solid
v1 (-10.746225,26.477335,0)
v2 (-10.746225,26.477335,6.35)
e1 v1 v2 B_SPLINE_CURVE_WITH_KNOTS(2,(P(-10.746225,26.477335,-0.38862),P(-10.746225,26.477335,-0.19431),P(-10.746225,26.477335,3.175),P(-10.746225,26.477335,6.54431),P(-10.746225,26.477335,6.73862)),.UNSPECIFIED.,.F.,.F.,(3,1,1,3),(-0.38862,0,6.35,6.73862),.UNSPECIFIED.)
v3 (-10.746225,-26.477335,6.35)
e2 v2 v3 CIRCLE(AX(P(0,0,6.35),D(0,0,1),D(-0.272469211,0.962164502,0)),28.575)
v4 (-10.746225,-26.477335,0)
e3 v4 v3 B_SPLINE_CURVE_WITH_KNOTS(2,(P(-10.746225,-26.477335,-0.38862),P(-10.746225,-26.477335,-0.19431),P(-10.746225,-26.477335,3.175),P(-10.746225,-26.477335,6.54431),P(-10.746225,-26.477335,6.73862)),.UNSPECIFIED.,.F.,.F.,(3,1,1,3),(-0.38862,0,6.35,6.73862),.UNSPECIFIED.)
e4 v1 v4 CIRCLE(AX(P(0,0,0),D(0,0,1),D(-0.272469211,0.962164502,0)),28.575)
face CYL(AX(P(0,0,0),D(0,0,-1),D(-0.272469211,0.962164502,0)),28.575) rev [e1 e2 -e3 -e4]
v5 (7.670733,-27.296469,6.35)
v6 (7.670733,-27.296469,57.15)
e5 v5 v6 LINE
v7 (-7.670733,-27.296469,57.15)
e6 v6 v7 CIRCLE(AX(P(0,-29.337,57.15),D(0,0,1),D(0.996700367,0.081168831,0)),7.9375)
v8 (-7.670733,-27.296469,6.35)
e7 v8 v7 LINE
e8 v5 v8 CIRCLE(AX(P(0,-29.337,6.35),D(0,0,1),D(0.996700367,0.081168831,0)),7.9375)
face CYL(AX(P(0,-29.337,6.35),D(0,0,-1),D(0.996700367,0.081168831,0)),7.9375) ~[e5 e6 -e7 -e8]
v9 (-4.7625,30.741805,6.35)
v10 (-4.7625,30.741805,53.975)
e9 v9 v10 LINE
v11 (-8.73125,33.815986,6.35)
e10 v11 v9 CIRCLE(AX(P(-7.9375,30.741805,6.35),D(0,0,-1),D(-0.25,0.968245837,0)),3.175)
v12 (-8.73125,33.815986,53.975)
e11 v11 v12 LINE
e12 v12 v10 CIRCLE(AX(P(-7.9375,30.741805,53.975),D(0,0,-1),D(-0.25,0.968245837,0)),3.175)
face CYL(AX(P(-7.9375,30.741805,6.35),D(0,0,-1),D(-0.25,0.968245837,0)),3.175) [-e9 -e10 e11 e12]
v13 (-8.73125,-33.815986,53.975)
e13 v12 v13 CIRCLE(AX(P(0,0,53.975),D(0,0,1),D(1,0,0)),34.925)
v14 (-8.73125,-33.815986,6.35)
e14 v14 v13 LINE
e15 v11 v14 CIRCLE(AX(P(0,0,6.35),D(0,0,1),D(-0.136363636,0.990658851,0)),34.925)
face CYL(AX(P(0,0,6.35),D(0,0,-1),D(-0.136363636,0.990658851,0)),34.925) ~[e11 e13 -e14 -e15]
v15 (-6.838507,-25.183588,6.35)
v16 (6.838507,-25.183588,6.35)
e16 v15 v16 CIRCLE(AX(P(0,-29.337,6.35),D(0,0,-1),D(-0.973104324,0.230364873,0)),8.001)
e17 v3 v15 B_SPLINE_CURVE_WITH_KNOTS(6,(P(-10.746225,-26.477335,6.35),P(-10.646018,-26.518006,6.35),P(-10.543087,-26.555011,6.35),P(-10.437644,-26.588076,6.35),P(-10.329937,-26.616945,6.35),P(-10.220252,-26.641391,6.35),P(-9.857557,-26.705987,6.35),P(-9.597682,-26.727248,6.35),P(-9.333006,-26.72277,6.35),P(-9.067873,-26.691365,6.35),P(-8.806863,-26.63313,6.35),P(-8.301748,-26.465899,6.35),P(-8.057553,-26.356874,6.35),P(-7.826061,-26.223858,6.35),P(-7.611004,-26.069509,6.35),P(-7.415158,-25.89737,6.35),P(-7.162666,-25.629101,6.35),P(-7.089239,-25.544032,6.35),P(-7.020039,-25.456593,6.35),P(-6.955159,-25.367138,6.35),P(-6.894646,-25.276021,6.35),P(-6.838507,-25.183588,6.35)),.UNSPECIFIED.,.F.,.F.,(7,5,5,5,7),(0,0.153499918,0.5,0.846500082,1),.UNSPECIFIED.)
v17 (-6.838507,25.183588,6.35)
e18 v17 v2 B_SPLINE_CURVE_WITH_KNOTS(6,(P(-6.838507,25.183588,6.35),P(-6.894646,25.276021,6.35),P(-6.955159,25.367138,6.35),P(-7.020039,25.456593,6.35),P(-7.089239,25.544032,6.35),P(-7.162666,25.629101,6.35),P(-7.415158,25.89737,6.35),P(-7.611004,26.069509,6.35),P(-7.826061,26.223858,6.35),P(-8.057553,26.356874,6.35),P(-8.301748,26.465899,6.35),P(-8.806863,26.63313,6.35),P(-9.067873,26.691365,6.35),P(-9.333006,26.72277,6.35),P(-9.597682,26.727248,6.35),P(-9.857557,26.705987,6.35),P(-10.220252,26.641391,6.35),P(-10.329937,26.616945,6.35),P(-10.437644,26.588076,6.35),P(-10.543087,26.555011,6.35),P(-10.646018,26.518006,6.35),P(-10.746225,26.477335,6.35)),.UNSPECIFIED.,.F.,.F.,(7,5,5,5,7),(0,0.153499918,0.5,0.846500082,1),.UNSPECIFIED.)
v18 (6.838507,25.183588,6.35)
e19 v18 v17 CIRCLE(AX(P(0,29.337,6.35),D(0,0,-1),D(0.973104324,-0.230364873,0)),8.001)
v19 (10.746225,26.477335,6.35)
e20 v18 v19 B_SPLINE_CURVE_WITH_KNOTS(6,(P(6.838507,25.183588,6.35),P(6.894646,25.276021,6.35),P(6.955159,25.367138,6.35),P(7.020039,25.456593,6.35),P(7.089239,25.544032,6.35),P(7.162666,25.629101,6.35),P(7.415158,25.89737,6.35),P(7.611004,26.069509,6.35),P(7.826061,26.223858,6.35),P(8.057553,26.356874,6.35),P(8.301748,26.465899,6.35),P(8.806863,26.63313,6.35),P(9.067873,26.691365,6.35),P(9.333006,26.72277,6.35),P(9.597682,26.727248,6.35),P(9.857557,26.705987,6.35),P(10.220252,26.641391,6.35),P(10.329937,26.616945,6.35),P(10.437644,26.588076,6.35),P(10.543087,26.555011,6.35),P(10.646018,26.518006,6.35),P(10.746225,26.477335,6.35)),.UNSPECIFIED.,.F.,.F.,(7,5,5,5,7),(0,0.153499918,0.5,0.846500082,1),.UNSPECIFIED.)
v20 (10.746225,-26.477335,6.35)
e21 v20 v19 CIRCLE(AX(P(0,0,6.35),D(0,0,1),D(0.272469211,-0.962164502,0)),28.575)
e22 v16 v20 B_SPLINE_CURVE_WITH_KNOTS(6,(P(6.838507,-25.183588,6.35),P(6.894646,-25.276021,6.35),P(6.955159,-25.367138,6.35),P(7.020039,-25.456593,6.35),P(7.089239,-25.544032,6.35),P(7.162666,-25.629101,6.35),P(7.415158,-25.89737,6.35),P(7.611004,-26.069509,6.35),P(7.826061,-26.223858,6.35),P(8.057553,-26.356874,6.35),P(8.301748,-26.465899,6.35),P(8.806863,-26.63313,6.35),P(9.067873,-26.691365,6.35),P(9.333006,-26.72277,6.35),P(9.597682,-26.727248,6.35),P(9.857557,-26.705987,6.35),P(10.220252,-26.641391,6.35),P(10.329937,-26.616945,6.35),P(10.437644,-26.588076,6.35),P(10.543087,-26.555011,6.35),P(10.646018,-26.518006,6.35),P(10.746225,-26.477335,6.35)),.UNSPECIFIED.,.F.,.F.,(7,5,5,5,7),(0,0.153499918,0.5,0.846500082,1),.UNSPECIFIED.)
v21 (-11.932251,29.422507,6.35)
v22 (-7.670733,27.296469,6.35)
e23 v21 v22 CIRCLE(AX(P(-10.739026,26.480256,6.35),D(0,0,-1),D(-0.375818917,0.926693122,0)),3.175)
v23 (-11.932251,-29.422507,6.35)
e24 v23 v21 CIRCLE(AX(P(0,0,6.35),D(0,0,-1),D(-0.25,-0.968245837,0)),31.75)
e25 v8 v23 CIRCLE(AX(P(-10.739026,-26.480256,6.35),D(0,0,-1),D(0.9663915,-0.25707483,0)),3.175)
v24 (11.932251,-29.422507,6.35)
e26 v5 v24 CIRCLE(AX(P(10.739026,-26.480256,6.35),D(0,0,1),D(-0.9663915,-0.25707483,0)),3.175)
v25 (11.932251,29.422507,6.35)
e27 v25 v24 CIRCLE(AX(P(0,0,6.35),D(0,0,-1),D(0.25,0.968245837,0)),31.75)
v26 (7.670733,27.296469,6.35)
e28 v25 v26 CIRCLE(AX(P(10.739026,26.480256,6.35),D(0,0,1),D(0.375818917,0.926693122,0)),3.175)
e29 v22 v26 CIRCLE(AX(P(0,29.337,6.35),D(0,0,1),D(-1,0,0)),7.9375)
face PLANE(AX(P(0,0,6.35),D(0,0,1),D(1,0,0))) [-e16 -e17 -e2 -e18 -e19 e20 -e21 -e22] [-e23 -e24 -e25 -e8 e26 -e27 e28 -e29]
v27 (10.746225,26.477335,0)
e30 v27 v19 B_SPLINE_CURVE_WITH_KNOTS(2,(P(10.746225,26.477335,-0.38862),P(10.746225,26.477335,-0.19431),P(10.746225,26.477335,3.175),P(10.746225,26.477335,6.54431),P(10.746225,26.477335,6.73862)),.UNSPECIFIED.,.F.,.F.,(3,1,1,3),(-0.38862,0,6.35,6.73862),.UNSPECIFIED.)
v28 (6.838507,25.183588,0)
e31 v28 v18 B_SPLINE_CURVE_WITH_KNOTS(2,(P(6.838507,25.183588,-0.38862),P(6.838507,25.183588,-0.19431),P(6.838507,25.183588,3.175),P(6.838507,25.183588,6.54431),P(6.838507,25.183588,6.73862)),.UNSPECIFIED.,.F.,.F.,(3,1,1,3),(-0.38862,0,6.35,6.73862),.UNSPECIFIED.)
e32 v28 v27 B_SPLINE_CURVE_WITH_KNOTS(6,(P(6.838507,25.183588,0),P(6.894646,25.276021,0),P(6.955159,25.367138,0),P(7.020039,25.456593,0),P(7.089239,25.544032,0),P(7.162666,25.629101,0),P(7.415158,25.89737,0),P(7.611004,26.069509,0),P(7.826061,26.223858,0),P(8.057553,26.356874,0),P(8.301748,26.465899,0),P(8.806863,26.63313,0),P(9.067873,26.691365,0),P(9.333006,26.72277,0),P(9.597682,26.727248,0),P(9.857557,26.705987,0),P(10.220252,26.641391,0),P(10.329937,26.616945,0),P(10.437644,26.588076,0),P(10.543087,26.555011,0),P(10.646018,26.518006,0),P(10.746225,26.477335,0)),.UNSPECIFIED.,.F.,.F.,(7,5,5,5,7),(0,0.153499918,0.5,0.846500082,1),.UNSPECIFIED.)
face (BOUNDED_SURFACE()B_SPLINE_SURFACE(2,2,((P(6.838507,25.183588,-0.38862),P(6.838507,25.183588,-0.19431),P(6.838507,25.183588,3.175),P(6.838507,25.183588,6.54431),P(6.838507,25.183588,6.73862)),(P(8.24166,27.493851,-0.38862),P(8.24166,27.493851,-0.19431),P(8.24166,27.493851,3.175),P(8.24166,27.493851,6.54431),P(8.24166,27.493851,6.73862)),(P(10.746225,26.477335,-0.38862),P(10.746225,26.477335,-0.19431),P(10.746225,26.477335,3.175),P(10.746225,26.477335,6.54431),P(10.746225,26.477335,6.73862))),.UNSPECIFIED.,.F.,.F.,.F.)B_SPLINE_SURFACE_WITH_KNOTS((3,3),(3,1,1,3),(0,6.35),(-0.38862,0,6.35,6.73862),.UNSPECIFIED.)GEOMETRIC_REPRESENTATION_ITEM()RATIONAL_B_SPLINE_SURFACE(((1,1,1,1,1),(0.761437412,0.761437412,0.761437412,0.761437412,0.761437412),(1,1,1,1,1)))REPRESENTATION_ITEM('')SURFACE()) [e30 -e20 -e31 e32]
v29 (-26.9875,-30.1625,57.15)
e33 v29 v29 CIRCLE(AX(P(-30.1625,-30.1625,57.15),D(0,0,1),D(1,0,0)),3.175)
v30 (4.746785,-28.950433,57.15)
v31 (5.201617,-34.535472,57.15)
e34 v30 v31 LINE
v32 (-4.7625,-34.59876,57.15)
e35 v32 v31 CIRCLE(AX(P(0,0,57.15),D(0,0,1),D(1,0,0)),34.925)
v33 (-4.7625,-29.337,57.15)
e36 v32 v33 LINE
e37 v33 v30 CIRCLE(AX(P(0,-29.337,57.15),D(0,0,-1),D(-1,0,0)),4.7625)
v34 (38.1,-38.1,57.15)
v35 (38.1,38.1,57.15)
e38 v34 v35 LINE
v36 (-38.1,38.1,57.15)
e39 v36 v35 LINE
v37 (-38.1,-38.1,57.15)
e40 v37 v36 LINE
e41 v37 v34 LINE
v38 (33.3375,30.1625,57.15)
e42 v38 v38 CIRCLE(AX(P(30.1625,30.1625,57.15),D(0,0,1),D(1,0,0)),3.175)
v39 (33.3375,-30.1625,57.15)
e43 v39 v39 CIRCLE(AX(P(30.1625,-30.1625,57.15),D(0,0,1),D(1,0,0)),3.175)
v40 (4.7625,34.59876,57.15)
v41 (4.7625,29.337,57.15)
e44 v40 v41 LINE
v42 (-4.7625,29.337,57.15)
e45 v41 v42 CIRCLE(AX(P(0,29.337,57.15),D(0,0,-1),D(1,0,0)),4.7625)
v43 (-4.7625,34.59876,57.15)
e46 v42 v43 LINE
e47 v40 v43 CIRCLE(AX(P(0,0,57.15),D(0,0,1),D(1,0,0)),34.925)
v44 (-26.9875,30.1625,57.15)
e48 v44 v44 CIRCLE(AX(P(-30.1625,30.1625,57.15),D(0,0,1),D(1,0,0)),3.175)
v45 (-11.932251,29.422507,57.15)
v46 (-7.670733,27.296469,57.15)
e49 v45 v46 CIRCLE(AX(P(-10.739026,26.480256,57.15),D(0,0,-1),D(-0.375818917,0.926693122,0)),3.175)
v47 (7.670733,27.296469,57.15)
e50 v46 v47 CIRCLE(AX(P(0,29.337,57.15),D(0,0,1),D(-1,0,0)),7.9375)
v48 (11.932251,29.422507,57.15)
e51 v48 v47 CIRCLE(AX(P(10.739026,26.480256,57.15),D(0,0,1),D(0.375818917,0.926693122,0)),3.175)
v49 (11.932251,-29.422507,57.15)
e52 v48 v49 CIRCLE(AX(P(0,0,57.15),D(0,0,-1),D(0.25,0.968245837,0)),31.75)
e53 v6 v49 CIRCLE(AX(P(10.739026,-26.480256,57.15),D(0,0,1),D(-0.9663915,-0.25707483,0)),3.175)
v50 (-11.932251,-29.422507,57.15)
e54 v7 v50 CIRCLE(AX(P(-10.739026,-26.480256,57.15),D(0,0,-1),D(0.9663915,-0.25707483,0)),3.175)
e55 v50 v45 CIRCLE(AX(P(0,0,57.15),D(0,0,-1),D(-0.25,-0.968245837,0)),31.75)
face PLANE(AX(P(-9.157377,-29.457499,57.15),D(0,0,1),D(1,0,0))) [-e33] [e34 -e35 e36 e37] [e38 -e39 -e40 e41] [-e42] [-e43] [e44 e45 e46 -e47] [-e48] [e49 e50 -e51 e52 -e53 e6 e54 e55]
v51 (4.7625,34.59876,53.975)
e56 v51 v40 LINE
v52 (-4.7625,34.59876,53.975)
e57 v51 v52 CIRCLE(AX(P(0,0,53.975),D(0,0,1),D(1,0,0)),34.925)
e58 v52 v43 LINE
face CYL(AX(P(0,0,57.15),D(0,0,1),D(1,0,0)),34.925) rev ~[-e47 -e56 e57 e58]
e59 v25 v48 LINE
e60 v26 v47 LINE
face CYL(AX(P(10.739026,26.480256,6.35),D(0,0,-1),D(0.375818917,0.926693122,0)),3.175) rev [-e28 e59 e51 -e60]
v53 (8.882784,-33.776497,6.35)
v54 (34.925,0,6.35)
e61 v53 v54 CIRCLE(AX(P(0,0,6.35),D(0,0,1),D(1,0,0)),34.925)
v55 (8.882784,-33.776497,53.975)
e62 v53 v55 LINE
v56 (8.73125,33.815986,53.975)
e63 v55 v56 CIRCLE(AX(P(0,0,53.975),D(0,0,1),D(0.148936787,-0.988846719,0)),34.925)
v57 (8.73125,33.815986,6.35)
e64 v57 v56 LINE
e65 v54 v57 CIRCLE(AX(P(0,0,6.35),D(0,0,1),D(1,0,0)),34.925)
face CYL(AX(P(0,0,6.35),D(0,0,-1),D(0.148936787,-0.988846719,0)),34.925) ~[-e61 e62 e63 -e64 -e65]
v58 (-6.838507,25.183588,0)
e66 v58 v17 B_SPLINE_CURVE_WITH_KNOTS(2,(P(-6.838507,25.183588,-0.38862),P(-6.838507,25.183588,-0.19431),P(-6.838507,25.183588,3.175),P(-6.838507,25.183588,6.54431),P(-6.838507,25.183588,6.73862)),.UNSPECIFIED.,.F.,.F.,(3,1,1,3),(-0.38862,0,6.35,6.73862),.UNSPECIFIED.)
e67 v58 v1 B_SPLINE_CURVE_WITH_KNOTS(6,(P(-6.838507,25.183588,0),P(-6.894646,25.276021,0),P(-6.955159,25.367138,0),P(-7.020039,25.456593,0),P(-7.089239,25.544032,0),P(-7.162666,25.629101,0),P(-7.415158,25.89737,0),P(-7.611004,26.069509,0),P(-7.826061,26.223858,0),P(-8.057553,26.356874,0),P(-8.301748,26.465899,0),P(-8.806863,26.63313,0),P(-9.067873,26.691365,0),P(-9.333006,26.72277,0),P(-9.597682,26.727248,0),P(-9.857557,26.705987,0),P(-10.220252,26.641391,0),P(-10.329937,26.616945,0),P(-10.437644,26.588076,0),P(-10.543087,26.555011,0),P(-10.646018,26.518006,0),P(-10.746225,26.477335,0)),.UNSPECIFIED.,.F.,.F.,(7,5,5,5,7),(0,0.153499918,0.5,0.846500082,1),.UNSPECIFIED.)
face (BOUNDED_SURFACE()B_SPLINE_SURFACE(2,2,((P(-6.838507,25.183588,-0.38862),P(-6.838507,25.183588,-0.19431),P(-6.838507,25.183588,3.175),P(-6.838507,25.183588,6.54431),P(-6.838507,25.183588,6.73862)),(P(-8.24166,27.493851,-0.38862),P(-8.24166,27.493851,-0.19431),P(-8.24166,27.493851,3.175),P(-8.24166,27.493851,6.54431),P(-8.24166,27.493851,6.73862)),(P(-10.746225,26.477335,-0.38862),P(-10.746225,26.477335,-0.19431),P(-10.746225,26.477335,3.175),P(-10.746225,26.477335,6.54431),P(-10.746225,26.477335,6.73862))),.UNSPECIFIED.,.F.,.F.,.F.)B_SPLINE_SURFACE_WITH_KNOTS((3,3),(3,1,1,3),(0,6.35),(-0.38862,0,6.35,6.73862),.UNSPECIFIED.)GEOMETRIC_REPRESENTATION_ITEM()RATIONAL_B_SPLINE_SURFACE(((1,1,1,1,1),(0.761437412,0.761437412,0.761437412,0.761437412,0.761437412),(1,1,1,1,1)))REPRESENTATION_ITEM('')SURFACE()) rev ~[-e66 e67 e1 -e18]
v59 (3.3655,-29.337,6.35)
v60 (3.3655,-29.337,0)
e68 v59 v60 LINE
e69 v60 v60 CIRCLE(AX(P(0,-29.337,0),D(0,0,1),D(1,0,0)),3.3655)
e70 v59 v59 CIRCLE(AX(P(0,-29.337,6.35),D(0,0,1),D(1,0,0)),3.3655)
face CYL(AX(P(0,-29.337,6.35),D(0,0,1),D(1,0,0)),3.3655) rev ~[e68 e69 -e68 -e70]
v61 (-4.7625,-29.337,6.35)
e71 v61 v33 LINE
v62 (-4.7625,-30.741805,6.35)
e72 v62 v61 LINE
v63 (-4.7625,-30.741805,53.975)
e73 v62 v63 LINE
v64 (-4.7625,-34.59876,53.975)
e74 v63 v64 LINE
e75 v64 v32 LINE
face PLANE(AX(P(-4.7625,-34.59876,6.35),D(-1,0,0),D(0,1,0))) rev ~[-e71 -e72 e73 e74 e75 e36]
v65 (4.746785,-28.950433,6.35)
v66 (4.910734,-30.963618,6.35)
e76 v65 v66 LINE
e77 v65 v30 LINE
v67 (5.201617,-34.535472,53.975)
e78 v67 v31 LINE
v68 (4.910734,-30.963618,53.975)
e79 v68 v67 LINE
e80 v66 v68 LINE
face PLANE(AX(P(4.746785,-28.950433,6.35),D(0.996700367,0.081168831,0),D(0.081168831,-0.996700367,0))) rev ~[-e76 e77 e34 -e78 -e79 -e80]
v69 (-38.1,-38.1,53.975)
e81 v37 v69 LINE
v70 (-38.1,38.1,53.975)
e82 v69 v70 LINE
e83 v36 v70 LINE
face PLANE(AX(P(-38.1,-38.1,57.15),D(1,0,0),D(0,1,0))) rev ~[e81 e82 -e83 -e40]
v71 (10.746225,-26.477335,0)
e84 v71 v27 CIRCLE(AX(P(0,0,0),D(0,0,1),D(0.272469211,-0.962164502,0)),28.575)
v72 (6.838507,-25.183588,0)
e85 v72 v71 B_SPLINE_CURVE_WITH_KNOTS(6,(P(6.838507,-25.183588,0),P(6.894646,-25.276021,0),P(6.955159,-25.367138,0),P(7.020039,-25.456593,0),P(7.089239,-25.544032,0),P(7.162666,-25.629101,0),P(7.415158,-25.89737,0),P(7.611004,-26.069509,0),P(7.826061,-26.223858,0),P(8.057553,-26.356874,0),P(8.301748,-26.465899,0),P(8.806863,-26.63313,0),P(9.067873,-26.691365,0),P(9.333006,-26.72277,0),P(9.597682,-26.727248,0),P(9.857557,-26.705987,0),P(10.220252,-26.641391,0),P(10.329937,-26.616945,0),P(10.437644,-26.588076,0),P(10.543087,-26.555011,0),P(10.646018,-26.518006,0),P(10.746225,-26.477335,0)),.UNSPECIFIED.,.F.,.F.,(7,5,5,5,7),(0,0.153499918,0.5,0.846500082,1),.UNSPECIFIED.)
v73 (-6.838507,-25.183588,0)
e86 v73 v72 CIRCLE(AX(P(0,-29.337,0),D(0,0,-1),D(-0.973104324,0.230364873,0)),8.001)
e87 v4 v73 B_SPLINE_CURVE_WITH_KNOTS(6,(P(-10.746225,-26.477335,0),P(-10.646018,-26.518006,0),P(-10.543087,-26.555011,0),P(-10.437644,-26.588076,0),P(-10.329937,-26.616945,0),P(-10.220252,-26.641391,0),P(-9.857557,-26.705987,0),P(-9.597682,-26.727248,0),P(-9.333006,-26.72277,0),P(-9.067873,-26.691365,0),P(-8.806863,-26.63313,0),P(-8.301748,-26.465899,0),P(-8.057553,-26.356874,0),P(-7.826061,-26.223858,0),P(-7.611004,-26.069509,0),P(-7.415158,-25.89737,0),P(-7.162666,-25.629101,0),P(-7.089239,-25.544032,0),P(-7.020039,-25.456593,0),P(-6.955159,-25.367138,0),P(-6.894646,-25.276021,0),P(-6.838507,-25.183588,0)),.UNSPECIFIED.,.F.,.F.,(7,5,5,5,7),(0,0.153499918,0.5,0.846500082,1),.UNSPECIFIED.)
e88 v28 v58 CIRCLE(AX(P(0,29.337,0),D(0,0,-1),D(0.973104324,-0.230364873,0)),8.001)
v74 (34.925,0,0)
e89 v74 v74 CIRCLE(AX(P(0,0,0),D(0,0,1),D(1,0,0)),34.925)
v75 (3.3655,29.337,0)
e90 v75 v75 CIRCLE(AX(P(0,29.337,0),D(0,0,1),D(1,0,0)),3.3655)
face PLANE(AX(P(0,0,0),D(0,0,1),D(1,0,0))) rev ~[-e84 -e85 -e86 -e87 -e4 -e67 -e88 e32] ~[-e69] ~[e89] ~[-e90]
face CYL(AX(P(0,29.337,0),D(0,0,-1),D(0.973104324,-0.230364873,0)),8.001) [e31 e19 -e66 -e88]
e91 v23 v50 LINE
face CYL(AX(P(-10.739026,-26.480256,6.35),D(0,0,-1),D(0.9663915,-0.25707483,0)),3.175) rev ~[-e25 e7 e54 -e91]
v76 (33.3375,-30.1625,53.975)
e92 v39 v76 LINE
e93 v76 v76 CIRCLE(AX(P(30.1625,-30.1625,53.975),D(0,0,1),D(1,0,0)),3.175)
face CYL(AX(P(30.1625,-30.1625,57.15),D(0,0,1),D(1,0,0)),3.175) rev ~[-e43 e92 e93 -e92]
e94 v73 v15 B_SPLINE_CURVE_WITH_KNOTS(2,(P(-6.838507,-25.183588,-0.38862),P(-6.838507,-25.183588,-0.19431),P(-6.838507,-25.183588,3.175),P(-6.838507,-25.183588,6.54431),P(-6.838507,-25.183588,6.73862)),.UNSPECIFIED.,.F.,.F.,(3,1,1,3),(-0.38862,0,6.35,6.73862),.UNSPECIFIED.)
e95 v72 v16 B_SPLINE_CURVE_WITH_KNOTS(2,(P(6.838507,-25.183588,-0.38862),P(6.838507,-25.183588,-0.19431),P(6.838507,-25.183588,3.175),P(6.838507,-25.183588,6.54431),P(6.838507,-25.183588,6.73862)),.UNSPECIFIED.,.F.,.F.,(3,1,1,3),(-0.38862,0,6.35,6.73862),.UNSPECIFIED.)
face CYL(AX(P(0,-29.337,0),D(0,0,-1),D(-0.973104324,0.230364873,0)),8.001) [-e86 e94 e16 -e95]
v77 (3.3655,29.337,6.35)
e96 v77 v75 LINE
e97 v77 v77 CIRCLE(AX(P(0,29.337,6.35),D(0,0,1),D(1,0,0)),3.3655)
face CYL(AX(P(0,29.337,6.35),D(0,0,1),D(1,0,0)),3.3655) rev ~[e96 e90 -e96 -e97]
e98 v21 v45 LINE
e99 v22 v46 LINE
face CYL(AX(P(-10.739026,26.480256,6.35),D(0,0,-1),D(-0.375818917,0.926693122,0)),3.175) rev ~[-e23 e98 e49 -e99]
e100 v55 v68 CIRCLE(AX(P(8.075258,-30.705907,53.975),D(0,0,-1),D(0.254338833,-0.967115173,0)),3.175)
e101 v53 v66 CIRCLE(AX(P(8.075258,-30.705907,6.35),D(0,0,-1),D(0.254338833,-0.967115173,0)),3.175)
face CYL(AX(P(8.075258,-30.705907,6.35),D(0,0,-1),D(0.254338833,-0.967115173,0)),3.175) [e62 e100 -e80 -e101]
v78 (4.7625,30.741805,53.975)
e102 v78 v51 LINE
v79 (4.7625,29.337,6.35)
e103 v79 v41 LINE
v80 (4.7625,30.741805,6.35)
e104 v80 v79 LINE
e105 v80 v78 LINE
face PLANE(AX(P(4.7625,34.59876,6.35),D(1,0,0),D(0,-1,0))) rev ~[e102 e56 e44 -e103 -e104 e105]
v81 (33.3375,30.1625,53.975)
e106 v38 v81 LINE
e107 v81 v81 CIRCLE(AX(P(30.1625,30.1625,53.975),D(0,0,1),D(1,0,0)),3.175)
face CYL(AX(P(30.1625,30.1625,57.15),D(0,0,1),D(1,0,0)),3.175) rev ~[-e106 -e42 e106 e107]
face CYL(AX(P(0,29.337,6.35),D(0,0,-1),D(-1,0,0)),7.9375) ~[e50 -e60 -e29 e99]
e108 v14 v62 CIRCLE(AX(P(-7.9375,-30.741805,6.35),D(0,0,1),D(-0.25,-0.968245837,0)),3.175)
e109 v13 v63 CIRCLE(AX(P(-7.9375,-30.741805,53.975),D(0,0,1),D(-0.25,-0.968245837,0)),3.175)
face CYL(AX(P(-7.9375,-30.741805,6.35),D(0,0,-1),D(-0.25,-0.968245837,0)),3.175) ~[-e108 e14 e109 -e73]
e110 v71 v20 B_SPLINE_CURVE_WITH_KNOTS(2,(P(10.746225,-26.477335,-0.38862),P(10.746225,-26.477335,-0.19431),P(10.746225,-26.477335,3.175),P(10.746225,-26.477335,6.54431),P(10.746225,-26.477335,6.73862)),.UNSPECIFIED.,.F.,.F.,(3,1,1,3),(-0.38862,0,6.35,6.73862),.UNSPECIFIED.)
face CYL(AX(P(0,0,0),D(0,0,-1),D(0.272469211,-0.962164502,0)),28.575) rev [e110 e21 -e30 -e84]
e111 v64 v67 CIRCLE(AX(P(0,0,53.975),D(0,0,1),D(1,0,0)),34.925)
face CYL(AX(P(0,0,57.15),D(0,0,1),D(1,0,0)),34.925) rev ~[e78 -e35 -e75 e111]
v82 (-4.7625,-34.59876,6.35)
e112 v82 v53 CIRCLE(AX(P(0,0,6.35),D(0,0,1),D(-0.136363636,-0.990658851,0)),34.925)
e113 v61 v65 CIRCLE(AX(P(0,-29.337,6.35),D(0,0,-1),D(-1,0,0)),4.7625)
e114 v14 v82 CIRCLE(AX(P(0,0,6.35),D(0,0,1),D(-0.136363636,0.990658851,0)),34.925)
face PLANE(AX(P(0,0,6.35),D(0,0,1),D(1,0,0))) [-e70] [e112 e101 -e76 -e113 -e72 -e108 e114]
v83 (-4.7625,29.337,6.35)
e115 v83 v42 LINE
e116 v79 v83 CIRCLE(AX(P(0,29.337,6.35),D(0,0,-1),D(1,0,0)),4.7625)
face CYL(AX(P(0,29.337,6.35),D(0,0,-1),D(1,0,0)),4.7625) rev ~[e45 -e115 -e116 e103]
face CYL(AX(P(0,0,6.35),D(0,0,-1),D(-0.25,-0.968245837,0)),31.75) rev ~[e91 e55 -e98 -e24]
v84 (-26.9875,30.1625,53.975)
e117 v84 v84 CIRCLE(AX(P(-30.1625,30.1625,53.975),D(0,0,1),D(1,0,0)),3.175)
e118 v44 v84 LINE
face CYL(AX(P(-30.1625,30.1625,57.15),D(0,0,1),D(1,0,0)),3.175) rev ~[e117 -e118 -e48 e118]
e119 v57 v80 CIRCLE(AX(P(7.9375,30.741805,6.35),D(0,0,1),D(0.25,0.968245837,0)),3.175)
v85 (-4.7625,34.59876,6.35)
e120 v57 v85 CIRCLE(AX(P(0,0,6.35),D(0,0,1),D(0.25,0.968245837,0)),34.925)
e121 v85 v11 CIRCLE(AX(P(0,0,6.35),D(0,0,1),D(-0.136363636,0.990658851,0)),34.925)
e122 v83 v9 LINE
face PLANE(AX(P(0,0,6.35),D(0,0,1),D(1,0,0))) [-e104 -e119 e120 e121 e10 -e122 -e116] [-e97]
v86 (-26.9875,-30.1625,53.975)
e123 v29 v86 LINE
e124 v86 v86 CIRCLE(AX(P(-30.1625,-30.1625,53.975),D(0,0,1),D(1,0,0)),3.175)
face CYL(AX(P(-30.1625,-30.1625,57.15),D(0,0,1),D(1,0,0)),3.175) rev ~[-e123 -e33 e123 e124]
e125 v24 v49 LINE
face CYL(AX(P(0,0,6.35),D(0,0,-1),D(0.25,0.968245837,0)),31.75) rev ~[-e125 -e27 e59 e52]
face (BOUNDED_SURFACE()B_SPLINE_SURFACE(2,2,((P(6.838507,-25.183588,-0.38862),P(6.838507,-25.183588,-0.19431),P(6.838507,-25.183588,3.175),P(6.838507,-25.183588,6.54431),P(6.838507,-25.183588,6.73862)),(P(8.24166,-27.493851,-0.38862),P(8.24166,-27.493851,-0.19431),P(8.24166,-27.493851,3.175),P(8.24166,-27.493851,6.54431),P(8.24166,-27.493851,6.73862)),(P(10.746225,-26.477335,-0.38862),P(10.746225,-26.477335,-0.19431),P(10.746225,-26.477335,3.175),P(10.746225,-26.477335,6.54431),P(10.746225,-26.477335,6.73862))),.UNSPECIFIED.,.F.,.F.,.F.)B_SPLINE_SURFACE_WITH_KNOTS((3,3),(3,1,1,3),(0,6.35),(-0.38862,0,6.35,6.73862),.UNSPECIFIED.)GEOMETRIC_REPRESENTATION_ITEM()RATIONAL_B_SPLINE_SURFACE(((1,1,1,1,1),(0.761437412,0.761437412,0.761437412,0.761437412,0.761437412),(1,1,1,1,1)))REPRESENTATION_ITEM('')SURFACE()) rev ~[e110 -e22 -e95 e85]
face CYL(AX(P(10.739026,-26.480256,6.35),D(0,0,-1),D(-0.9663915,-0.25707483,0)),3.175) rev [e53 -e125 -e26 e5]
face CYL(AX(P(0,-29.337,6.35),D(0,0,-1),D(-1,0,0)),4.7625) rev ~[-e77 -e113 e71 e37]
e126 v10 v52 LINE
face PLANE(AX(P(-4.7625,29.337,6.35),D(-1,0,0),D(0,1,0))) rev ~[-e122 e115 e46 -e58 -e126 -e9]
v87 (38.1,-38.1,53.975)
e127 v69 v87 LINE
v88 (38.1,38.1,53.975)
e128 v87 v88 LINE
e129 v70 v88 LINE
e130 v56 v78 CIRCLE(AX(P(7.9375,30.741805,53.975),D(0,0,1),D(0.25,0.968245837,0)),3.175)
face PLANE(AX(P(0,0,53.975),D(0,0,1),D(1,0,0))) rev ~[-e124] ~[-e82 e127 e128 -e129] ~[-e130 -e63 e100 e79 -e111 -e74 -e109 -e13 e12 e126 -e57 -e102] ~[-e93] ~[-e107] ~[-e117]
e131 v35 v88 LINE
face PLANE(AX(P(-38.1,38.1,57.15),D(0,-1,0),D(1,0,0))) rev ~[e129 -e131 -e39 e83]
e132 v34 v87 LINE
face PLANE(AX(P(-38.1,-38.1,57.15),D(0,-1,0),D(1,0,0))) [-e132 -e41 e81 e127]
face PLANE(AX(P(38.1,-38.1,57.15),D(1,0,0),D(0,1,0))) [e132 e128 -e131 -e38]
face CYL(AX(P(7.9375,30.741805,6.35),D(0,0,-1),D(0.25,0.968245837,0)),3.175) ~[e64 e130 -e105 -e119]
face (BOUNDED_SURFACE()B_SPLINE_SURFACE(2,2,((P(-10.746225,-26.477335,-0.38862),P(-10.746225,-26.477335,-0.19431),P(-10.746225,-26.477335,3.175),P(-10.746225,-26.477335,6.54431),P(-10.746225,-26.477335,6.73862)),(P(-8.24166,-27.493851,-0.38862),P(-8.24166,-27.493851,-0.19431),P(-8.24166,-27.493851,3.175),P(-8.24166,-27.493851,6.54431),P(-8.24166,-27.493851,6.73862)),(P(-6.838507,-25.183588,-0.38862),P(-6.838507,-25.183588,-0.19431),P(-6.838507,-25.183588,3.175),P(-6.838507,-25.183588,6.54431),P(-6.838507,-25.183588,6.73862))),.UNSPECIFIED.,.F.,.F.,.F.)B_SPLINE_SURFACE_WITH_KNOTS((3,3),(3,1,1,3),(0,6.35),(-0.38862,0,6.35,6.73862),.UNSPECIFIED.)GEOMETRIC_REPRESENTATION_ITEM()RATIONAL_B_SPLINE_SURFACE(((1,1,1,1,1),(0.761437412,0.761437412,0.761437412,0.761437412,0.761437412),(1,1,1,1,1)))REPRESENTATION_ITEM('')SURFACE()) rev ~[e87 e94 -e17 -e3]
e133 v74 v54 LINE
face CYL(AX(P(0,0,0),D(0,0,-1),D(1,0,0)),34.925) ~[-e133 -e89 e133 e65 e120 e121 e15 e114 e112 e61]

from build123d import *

# Parameters (mm, degrees)
F0_R         = 34.925
F1_DEPTH     = 6.35
F3_DEPTH     = 50.8
F4_R         = 3.3655
F5_DEPTH     = 6.35
F6_W         = 76.2
F6_H         = 76.2
F6_R         = 34.925
F7_DEPTH     = 3.175
F8_R         = 3.175
F9_DEPTH     = 3.175
F10_T1_DEPTH = 50.8
F10_T3_DEPTH = 47.625
F12_DEPTH    = 6.35
F13_R        = 3.175


# Not quite as in the source:
# - a fillet or chamfer that OpenCascade refuses, or shapes differently, is made with other operations: its cross-section is extruded or revolved along the edge and cut away or added


with BuildPart() as f1:
    # F0 (on Top) → F1 (new body)
    with BuildSketch(Plane.XY):
        Circle(F0_R)
    extrude(amount=F1_DEPTH)

    # F2 (on face) → F3 (join)
    with BuildSketch(Plane.XY.offset(6.35)):
        with BuildLine():
            ThreePointArc((4.7625, 29.337), (0, 24.5745), (-4.7625, 29.337))
            Line((-4.7625, 29.337), (-4.7625, 34.5987603644))
            ThreePointArc((-4.7625, 34.5987603644), (-34.925, 0), (-4.7625, -34.5987603644))
            Line((-4.7625, -34.5987603644), (-4.7625, -29.337))
            ThreePointArc((-4.7625, -29.337), (-0.1934429178, -24.5784302477), (4.7467854961, -28.9504334416))
            Line((4.7467854961, -28.9504334416), (5.2016172982, -34.5354716557))
            ThreePointArc((5.2016172982, -34.5354716557), (26.4709473682, -22.7825496912), (34.925, 0))
            ThreePointArc((34.925, 0), (26.3257092734, 22.950221268), (4.7625, 34.5987603644))
            Line((4.7625, 34.5987603644), (4.7625, 29.337))
        make_face()
        with BuildLine():
            ThreePointArc((-7.9375, -30.7418053105), (-31.75, 0), (-7.9375, 30.7418053105))
            Line((-7.9375, 30.7418053105), (-7.9375, 29.337))
            ThreePointArc((-7.9375, 29.337), (0, 21.3995), (7.9375, 29.337))
            Line((7.9375, 29.337), (7.9375, 30.7418053105))
            ThreePointArc((7.9375, 30.7418053105), (31.7499202127, 0.0711792809), (8.075257951, -30.7059067449))
            Line((8.075257951, -30.7059067449), (7.9113091602, -28.6927224026))
            ThreePointArc((7.9113091602, -28.6927224026), (-0.3224048629, -21.4060504128), (-7.9375, -29.337))
            Line((-7.9375, -29.337), (-7.9375, -30.7418053105))
        make_face(mode=Mode.SUBTRACT)
    extrude(amount=F3_DEPTH)

    # F4 (on face) → F5 (cut, through all)
    with BuildSketch(Plane.XY.offset(6.35)):
        with Locations((0, 29.337)):
            Circle(F4_R)
        with Locations((0, -29.337)):
            Circle(F4_R)
    extrude(amount=-F5_DEPTH, mode=Mode.SUBTRACT)

    # F6 (on face) → F7 (join)
    with BuildSketch(Plane.XY.offset(57.15)):
        Rectangle(F6_W, F6_H)
        Circle(F6_R, mode=Mode.SUBTRACT)
    extrude(amount=-F7_DEPTH)

    # F8 (on face) → F9 (cut, through all)
    with BuildSketch(Plane.XY.offset(57.15)):
        with Locations((-30.1625, 30.1625)):
            Circle(F8_R)
        with Locations((30.1625, 30.1625)):
            Circle(F8_R)
        with Locations((-30.1625, -30.1625)):
            Circle(F8_R)
        with Locations((30.1625, -30.1625)):
            Circle(F8_R)
    extrude(amount=-F9_DEPTH, mode=Mode.SUBTRACT)

    # F10: fillet of radius 3.175 on 8 edges, made by hand

    # F10_s2 → F10_t1 (join)
    with BuildSketch(Plane.XY.offset(6.35)):
        with BuildLine():
            ThreePointArc((-7.6707325335, -27.2964685374), (-9.3216408312, -29.3213201135), (-11.9322506076, -29.4225066138))
            Line((-11.9322506076, -29.4225066138), (-12.0515731137, -29.7167316799))
            ThreePointArc((-12.0515731137, -29.7167316799), (-10.0563182102, -30.4498771805), (-8.016875, -31.0492233636))
            Line((-8.016875, -31.0492233636), (-7.62, -30.7418053105))
            ThreePointArc((-7.62, -30.7418053105), (-7.62, -29.337), (-7.3639032321, -27.3780897959))
            Line((-7.3639032321, -27.3780897959), (-7.6707325335, -27.2964685374))
        make_face()
        with BuildLine():
            ThreePointArc((7.6707325335, -27.2964685374), (9.3216408312, -29.3213201135), (11.9322506076, -29.4225066138))
            Line((11.9322506076, -29.4225066138), (12.0515731137, -29.7167316799))
            ThreePointArc((12.0515731137, -29.7167316799), (10.1245575171, -30.4272557312), (8.1560105306, -31.0129658123))
            Line((8.1560105306, -31.0129658123), (7.7588055846, -30.7316778488))
            ThreePointArc((7.7588055846, -30.7316778488), (7.5948567937, -28.7184935065), (7.3639032321, -27.3780897959))
            Line((7.3639032321, -27.3780897959), (7.6707325335, -27.2964685374))
        make_face()
        with BuildLine():
            ThreePointArc((-11.9322506076, 29.4225066138), (-9.3216408312, 29.3213201135), (-7.6707325335, 27.2964685374))
            Line((-7.6707325335, 27.2964685374), (-7.3639032321, 27.3780897959))
            ThreePointArc((-7.3639032321, 27.3780897959), (-7.62, 29.337), (-7.62, 30.7418053105))
            Line((-7.62, 30.7418053105), (-8.016875, 31.0492233636))
            ThreePointArc((-8.016875, 31.0492233636), (-10.0563182102, 30.4498771805), (-12.0515731137, 29.7167316799))
            Line((-12.0515731137, 29.7167316799), (-11.9322506076, 29.4225066138))
        make_face()
        with BuildLine():
            ThreePointArc((11.9322506076, 29.4225066138), (9.3216408312, 29.3213201135), (7.6707325335, 27.2964685374))
            Line((7.6707325335, 27.2964685374), (7.3639032321, 27.3780897959))
            ThreePointArc((7.3639032321, 27.3780897959), (7.62, 29.337), (7.62, 30.7418053105))
            Line((7.62, 30.7418053105), (8.016875, 31.0492233636))
            ThreePointArc((8.016875, 31.0492233636), (10.0563182102, 30.4498771805), (12.0515731137, 29.7167316799))
            Line((12.0515731137, 29.7167316799), (11.9322506076, 29.4225066138))
        make_face()
    extrude(amount=F10_T1_DEPTH)

    # F10_s4 → F10_t3 (cut)
    with BuildSketch(Plane.XY.offset(6.35)):
        with BuildLine():
            ThreePointArc((-8.73125, -33.8159858416), (-5.9932175167, -33.2518632033), (-4.7625, -30.7418053105))
            Line((-4.7625, -30.7418053105), (-4.7625, -34.5987603644))
            ThreePointArc((-4.7625, -34.5987603644), (-6.7582176832, -34.2648817121), (-8.73125, -33.8159858416))
        make_face()
        with BuildLine():
            ThreePointArc((8.8827837461, -33.7764974193), (6.2403375987, -33.2969861146), (4.910734287, -30.9636177838))
            Line((4.910734287, -30.9636177838), (5.2016172982, -34.5354716557))
            ThreePointArc((5.2016172982, -34.5354716557), (7.0524179305, -34.2055408718), (8.8827837461, -33.7764974193))
        make_face()
        with BuildLine():
            ThreePointArc((8.73125, 33.8159858416), (5.9932175167, 33.2518632033), (4.7625, 30.7418053105))
            Line((4.7625, 30.7418053105), (4.7625, 34.5987603644))
            ThreePointArc((4.7625, 34.5987603644), (6.7582176832, 34.2648817121), (8.73125, 33.8159858416))
        make_face()
        with BuildLine():
            ThreePointArc((-8.73125, 33.8159858416), (-5.9932175167, 33.2518632033), (-4.7625, 30.7418053105))
            Line((-4.7625, 30.7418053105), (-4.7625, 34.5987603644))
            ThreePointArc((-4.7625, 34.5987603644), (-6.7582176832, 34.2648817121), (-8.73125, 33.8159858416))
        make_face()
    extrude(amount=F10_T3_DEPTH, mode=Mode.SUBTRACT)

    # F11 (on Top) → F12 (cut, through all)
    with BuildSketch(Plane.XY):
        with BuildLine():
            ThreePointArc((7.7858076955, 27.4938506494), (0, 21.336), (-7.7858076955, 27.4938506494))
            ThreePointArc((-7.7858076955, 27.4938506494), (-28.575, 0), (-7.7858076955, -27.4938506494))
            ThreePointArc((-7.7858076955, -27.4938506494), (0, -21.336), (7.7858076955, -27.4938506494))
            ThreePointArc((7.7858076955, -27.4938506494), (28.575, 0), (7.7858076955, 27.4938506494))
        make_face()
    extrude(amount=F12_DEPTH, mode=Mode.SUBTRACT)

    # F13
    f13_edges = [f1.edges().sort_by_distance(p)[0] for p in [
        (-7.785808, 27.493851, 3.175),
        (7.785808, 27.493851, 3.175),
        (-7.785808, -27.493851, 3.175),
        (7.785808, -27.493851, 3.175),
    ]]
    fillet(f13_edges, radius=F13_R)


solid = f1.part
